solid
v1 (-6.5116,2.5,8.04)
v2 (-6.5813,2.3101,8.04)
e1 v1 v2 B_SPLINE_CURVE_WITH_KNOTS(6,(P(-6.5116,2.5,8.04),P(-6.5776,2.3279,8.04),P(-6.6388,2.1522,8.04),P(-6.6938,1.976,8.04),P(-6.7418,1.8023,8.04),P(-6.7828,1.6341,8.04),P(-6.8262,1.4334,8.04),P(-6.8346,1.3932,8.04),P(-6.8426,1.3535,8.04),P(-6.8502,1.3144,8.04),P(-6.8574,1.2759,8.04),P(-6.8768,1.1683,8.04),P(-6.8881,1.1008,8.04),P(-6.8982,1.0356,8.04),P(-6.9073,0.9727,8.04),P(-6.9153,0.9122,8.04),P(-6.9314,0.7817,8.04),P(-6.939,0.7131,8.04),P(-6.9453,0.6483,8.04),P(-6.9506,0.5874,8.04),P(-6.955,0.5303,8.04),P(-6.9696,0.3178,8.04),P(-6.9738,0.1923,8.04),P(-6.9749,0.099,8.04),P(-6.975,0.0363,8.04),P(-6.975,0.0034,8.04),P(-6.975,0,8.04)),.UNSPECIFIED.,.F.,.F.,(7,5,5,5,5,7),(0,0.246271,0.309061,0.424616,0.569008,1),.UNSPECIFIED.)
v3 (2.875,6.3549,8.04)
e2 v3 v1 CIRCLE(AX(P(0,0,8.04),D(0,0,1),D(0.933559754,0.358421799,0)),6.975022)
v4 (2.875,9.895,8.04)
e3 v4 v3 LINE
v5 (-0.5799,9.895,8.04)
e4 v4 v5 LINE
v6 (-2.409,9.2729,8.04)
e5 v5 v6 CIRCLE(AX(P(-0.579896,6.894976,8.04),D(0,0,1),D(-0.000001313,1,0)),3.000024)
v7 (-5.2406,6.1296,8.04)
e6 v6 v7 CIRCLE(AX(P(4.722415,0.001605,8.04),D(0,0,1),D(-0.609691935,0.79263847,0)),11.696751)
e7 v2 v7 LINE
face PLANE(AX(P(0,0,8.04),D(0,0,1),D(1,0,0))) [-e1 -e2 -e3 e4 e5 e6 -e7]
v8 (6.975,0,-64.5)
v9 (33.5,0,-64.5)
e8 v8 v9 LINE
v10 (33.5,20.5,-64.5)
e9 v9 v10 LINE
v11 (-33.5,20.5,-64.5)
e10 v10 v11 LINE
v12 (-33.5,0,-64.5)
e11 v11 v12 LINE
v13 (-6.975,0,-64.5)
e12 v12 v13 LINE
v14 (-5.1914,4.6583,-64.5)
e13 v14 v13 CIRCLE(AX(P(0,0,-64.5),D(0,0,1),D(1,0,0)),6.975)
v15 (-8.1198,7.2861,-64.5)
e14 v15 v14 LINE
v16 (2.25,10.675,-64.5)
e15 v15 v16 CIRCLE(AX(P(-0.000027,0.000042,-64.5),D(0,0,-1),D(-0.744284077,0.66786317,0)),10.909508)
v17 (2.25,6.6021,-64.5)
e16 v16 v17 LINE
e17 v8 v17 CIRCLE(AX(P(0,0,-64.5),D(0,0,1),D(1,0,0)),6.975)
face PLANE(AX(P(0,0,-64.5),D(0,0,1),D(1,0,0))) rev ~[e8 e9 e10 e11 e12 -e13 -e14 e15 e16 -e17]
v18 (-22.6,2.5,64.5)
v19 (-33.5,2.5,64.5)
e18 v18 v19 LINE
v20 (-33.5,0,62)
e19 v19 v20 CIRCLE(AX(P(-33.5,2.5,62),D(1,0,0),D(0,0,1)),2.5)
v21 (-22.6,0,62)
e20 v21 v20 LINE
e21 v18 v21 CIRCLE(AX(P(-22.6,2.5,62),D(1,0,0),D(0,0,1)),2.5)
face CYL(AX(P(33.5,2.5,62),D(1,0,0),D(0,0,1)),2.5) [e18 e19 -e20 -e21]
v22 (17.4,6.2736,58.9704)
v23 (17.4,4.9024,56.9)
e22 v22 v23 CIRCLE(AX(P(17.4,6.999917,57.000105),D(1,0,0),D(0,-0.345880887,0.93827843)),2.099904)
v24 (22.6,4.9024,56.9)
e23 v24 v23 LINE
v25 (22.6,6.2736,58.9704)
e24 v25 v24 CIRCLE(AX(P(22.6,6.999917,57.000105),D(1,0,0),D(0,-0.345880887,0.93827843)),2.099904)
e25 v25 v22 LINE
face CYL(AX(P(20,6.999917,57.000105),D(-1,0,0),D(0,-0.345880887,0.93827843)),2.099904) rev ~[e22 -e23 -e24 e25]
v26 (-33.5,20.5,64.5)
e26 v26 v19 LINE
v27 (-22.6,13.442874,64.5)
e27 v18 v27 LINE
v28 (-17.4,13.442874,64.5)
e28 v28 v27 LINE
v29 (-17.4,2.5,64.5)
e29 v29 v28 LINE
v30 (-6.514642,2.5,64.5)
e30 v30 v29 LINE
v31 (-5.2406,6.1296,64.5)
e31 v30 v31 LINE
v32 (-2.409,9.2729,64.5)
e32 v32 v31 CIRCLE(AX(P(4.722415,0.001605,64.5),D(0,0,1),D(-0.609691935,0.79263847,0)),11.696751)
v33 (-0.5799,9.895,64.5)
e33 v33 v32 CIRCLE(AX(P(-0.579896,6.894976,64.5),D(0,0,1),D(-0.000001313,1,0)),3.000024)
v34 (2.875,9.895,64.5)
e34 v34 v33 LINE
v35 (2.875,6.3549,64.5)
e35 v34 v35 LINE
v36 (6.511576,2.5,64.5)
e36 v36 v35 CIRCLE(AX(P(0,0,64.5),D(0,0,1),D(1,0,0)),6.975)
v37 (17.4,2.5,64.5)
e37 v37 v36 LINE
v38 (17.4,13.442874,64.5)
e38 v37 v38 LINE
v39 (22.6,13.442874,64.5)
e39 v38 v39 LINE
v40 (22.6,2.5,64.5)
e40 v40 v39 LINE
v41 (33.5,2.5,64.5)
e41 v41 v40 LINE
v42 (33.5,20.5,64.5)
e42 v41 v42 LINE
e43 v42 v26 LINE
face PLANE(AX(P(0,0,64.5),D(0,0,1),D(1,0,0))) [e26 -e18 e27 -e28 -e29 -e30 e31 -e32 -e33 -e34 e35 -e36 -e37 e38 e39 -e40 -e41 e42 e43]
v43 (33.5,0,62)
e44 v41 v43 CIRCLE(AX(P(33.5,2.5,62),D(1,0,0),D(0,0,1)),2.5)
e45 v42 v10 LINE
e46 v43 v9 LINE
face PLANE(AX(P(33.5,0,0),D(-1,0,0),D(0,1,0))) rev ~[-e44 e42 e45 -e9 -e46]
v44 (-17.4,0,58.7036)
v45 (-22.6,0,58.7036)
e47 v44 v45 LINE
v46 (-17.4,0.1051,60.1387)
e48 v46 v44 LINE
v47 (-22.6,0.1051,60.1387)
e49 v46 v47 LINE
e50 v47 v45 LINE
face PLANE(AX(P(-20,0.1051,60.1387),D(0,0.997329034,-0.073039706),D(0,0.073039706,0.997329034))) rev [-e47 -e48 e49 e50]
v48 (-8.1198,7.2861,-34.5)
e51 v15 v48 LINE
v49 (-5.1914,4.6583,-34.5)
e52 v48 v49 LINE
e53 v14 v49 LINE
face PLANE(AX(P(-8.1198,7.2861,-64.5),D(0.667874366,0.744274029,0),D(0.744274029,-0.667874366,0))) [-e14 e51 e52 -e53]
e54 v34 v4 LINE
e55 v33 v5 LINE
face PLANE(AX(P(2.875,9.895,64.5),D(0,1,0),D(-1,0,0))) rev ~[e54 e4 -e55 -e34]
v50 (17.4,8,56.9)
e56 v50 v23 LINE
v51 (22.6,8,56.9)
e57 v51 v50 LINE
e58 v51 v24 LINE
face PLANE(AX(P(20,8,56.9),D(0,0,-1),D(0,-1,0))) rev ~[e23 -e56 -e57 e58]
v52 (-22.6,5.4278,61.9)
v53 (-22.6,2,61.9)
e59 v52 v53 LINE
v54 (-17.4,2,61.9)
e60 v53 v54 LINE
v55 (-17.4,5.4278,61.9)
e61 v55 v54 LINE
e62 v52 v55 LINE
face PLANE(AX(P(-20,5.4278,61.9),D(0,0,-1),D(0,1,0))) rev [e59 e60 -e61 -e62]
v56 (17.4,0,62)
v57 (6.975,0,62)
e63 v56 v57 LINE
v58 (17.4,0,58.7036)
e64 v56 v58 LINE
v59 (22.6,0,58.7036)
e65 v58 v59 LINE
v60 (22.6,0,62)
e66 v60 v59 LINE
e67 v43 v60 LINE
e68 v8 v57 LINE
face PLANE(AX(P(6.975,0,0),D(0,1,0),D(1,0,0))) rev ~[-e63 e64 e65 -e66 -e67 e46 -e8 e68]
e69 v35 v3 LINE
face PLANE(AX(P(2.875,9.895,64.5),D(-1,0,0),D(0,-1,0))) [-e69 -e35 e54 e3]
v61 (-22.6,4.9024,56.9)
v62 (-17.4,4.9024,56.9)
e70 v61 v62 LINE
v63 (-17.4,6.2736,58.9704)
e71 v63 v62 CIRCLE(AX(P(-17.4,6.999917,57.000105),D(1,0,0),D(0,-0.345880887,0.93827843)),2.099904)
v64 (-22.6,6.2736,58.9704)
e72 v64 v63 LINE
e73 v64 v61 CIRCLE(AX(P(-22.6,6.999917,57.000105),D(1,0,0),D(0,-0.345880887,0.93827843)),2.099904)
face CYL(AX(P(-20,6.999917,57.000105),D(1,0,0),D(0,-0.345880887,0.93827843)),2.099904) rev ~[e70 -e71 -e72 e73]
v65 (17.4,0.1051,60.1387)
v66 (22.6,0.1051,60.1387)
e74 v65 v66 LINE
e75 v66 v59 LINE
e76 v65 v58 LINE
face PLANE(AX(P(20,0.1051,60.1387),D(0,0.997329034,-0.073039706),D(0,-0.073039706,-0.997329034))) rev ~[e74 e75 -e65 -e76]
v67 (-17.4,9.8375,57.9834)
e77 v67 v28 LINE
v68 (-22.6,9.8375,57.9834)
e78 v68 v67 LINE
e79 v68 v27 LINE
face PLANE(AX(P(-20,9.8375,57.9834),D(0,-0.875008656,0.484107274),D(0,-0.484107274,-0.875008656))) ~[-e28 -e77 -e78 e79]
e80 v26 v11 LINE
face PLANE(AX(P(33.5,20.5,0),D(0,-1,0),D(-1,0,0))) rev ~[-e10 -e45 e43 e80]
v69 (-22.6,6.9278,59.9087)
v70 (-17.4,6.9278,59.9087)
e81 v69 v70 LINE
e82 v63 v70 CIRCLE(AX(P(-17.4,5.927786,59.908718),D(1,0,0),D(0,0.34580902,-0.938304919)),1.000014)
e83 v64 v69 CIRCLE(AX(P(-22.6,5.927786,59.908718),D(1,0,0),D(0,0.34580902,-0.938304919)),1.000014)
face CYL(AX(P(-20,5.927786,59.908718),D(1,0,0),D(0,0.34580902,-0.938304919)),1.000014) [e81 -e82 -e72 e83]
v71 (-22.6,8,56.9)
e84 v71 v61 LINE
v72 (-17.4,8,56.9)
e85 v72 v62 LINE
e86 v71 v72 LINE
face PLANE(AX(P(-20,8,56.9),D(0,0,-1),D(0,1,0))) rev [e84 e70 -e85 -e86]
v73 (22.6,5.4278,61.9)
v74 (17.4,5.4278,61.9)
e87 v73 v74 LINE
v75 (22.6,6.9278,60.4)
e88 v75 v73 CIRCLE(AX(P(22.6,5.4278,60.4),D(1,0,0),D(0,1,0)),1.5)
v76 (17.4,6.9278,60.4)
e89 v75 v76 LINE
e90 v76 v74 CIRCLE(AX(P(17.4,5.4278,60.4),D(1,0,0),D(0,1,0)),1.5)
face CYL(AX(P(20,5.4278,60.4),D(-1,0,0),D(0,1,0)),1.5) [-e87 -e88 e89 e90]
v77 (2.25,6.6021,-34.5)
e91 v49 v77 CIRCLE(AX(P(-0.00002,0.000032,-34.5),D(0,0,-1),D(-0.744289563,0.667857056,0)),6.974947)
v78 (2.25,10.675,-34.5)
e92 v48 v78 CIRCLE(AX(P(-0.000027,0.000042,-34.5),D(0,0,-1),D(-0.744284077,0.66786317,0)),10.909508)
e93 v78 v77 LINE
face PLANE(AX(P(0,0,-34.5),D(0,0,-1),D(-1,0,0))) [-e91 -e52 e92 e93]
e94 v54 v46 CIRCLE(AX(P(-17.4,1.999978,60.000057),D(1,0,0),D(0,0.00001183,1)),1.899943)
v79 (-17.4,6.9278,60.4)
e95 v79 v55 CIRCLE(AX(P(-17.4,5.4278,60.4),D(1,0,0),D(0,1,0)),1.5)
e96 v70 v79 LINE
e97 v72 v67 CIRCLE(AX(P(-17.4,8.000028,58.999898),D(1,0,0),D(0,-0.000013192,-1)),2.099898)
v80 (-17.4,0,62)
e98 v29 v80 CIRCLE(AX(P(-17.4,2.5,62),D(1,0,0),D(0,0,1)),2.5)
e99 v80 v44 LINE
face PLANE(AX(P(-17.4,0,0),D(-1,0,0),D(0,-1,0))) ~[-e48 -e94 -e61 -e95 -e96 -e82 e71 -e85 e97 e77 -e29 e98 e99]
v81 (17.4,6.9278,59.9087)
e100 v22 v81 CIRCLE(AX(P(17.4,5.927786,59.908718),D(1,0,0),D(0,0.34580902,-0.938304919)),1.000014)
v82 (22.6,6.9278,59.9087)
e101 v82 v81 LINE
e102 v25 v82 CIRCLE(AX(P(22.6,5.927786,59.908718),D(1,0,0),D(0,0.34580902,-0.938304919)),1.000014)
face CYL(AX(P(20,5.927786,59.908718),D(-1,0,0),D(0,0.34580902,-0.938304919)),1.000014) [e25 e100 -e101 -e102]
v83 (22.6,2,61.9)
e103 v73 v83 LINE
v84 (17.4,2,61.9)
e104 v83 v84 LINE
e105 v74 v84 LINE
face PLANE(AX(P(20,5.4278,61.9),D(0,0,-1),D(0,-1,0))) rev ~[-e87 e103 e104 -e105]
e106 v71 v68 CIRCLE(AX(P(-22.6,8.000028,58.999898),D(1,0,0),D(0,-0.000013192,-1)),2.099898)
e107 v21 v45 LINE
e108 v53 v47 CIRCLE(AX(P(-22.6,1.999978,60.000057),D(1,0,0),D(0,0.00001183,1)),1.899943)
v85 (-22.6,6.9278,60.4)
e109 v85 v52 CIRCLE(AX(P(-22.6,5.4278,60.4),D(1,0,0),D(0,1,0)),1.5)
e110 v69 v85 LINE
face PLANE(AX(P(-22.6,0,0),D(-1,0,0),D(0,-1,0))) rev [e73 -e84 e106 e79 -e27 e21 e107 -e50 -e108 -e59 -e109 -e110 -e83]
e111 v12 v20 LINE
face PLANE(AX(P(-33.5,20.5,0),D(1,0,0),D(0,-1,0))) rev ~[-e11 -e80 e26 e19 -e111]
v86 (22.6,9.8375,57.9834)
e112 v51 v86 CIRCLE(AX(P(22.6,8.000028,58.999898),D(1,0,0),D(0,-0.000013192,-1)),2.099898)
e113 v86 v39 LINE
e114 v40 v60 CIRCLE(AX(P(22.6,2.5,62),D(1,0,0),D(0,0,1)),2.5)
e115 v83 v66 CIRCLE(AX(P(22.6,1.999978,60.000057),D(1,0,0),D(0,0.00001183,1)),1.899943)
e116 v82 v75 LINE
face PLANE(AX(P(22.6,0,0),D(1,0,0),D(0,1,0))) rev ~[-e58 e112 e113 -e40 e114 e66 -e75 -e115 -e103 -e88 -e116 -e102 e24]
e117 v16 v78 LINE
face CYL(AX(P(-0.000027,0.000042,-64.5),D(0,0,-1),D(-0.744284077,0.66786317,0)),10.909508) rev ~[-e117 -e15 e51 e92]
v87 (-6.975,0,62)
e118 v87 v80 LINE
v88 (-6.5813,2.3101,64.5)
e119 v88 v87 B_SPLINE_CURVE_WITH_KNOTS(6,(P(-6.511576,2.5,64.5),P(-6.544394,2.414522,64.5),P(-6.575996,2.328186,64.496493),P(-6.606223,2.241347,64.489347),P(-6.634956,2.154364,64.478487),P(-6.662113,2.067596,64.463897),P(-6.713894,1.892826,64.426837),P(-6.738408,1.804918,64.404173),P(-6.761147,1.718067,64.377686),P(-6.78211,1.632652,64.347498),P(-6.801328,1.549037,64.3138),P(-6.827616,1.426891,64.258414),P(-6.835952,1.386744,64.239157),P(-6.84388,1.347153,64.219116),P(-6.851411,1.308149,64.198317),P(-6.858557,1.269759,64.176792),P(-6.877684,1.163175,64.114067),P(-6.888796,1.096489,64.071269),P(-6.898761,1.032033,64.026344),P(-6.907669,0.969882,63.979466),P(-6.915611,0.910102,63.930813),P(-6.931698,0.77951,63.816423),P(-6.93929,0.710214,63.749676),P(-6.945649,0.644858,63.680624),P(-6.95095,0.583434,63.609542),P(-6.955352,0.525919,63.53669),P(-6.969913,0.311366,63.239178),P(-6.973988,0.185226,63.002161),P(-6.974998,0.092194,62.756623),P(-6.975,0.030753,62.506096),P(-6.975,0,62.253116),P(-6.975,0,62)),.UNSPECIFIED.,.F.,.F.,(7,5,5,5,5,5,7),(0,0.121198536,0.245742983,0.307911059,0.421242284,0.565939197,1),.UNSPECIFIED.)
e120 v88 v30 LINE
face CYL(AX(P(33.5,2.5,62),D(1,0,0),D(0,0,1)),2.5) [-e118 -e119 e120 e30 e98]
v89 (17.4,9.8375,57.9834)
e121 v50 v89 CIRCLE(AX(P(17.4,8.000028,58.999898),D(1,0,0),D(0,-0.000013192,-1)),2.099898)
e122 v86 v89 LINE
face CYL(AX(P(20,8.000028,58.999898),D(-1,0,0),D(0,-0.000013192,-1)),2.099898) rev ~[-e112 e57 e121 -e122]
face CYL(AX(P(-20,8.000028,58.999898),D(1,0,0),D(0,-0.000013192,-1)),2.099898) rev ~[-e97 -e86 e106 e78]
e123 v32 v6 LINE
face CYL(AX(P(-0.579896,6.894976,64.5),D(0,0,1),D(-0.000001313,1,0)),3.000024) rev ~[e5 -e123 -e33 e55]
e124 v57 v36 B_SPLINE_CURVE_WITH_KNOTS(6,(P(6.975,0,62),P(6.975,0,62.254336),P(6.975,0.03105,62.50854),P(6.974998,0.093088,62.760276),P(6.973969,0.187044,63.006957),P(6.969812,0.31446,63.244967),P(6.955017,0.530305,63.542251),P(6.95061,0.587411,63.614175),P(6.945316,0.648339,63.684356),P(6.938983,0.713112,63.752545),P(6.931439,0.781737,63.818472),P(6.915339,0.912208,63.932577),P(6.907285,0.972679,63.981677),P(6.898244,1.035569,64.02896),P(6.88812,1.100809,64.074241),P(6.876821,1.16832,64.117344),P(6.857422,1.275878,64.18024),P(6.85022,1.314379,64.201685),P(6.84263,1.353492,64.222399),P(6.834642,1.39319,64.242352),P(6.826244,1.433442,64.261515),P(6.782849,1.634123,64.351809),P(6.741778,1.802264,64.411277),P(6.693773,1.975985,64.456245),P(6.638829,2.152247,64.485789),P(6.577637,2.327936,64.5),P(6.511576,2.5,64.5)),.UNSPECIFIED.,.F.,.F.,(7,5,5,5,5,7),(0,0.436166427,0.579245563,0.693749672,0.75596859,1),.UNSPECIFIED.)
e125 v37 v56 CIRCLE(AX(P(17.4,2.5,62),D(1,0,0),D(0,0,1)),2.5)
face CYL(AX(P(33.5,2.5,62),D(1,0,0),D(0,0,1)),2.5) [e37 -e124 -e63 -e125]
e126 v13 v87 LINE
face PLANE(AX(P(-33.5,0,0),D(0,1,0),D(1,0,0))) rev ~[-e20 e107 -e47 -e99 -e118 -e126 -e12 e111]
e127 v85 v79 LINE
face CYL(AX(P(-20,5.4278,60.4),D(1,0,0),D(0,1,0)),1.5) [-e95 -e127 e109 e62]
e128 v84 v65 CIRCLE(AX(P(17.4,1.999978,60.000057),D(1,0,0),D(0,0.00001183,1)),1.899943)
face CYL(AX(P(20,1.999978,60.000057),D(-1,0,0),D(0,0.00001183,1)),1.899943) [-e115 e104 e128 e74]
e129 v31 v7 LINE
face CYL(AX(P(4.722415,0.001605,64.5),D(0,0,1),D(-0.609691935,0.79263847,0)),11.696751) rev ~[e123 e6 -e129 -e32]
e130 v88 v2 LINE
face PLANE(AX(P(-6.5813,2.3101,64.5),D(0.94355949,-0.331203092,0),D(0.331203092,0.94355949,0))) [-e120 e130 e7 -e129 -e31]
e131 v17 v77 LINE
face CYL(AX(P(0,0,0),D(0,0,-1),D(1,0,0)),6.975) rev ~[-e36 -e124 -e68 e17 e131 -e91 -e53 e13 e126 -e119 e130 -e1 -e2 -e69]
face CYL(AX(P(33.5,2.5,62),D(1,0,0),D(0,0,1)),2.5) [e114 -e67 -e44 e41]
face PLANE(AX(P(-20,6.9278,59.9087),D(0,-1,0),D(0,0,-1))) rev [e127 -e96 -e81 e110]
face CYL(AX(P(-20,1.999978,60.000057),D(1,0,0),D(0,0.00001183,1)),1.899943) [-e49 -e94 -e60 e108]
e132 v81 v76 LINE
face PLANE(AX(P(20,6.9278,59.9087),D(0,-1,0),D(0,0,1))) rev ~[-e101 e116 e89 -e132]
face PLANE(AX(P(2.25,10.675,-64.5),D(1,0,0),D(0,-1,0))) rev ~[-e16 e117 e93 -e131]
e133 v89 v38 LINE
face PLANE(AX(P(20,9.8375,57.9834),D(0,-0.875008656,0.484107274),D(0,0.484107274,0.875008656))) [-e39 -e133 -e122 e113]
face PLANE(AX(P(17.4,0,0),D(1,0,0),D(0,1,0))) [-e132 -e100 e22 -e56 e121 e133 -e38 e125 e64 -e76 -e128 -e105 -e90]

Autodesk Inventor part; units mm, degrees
ref_plane "XZ Plane" through (0, 0, 0) normal (0, 1, 0) x (-1, 0, 0)
ref_plane "XY Plane" through (0, 0, 0) normal (0, 0, 1) x (1, 0, 0)
sketch "Sketch1" plane through (0, 0, 0) normal (0, 0, 1) x (1, 0, 0)
  line L0 (0, 0) -> (0, 44.0101) construction
  line L1 (-33.5, 0) -> (-6.975, 0)
  line L2 (6.975, 0) -> (33.5, 0)
  arc A0 (6.975, 0) -> (-6.975, 0) centre (0, 0) ccw
  line L3 (33.5, 0) -> (33.5, 20.5)
  line L4 (33.5, 20.5) -> (-33.5, 20.5)
  line L5 (-33.5, 20.5) -> (-33.5, 0)
ref_plane "Work Plane1" through (20, 0, 0) normal (1, 0, 0) x (0, 1, 0)
extrude "Extrusion3" add sketch "Sketch1" along normal mid plane 129
sketch "Sketch4" plane through (20, 0, 0) normal (1, 0, 0) x (0, 1, 0)
  line L0 (0, 64.5) -> (0, -64.5) projected
  line L1 (2, 64.6) -> (10.1, 64.6)
  arc A0 (8, 56.9) -> (9.8375, 57.9834) centre (8, 59) ccw
  line L2 (8, 56.9) -> (4.9024, 56.9)
  arc A1 (6.2736, 58.9704) -> (4.9024, 56.9) centre (7, 57) ccw
  line L3 (6.9278, 59.9087) -> (6.9278, 60.4)
  line L4 (5.4278, 61.9) -> (2, 61.9)
  arc A2 (2, 61.9) -> (0.1051, 60.1387) centre (2, 60) ccw
  line L5 (0.1051, 60.1387) -> (0, 58.7036)
  line L6 (0, 62.6) -> (0, 58.7036)
  line L7 (0, -64.5) -> (0, 64.5) projected
  arc A3 (2, 64.6) -> (0, 62.6) centre (2, 62.6) ccw
  arc A4 (6.9278, 60.4) -> (5.4278, 61.9) centre (5.4278, 60.4) ccw
  line L8 (9.8375, 57.9834) -> (13.4982, 64.6)
  line L9 (13.4982, 64.6) -> (10.1, 64.6)
  arc A5 (6.2736, 58.9704) -> (6.9278, 59.9087) centre (5.9278, 59.9087) ccw
  point P0 (0, 0)
  point P1 (0, 64.6)
  point P2 (8, 64.6)
  point P3 (10.1, 62.5)
  point P4 (6.9278, 59.0988)
  point P5 (6.9278, 61.9)
  point P6 (0, 62.6)
  dimension "d33" = 2
  dimension "d34" = 1.5
  dimension "d35" = 1
extrude "Extrusion4" cut sketch "Sketch4" along normal mid plane 5.2
mirror "Mirror2" about plane through (0, 0, 0) normal (1, 0, 0) of "Extrusion4"
sketch "Sketch5" plane through (33.5, 0, 64.5) normal (1, 0, 0) x (0, 0, -1)
  line L0 (1.9, 0) -> (5.7964, 0) projected
  arc A0 (0, 2.5) -> (2.5, 0) centre (2.5, 2.5) ccw
  line L1 (2.5, 2.5) -> (2.5, 0) construction
  line L2 (2.5, 2.5) -> (5, 2.5) construction
  line L3 (2.5, 2.5) -> (0, 2.5) construction
  line L4 (0, 0) -> (0, 20.5) projected
  line L5 (0, 2.5) -> (0, 0)
  line L6 (0, 0) -> (129, 0) projected
  point P0 (64.5, 0)
  dimension "d36" = 90
  dimension "d37" = 90
  dimension "d38" = 2.5
extrude "Extrusion5" cut sketch "Sketch5" against normal through all
sketch "Sketch6" plane through (0, 0, 64.5) normal (0, 0, 1) x (1, 0, 0)
  arc A0 (6.5116, 2.5) -> (-6.5116, 2.5) centre (0, 0) ccw projected
  line L0 (0, 6.975) -> (2.875, 6.975) construction
  line L1 (2.875, 6.975) -> (2.875, 9.895) construction
  line L2 (-17.4, 0) -> (-6.975, 0) projected
  line L3 (2.875, 9.895) -> (2.875, 6.3549)
  spline S0 degree 6 poles (-6.5116, 2.5) (-6.5776, 2.3279) (-6.6388, 2.1522) (-6.6938, 1.976) (-6.7418, 1.8023) (-6.7828, 1.6341) (-6.8262, 1.4334) (-6.8346, 1.3932) (-6.8426, 1.3535) (-6.8502, 1.3144) (-6.8574, 1.2759) (-6.8768, 1.1683) (-6.8881, 1.1008) (-6.8982, 1.0356) (-6.9073, 0.9727) (-6.9153, 0.9122) (-6.9314, 0.7817) (-6.939, 0.7131) (-6.9453, 0.6483) (-6.9506, 0.5874) (-6.955, 0.5303) (-6.9696, 0.3178) (-6.9738, 0.1923) (-6.9749, 0.099) (-6.975, 0.0363) (-6.975, 0.0034) (-6.975, 0.0002) knots 0 0 0 0 0 0 0 0.246271 0.246271 0.246271 0.246271 0.246271 0.309061 0.309061 0.309061 0.309061 0.309061 0.424616 0.424616 0.424616 0.424616 0.424616 0.569008 0.569008 0.569008 0.569008 0.569008 1 1 1 1 1 1 1 projected
  line L4 (2.875, 9.895) -> (-0.5799, 9.895)
  line L5 (-2.875, 9.895) -> (-2.875, 8.895) construction
  arc A1 (-2.409, 9.2729) -> (-5.2406, 6.1296) centre (4.7239, 0) ccw
  arc A2 (-0.5799, 9.895) -> (-2.409, 9.2729) centre (-0.5799, 6.895) ccw
  line L6 (-6.5813, 2.3101) -> (-5.2406, 6.1296)
  point P0 (-1.5174, 9.895)
  dimension "d41" = 2.875
  dimension "d42" = 2.92
  dimension "d50" = 5.75
  dimension "d52" = 3
sketch "Sketch7" plane through (0, 0, -64.5) normal (0, 0, -1) x (-1, 0, 0)
  arc A0 (6.975, 0) -> (-6.975, 0) centre (0, 0) ccw construction
  line L0 (0, 6.975) -> (-2.25, 6.975) construction
  line L1 (-2.25, 6.975) -> (-2.25, 10.675) construction
  arc A1 (8.1198, 7.2861) -> (-2.25, 10.675) centre (0, 0) ccw
  line L2 (0, 0) -> (8.1198, 7.2861) construction
  line L3 (0, 0) -> (-2.25, 10.675) construction
  line L4 (-2.25, 10.675) -> (-2.25, 6.6021)
  line L5 (8.1198, 7.2861) -> (5.1914, 4.6583)
  arc A2 (5.1914, 4.6583) -> (-2.25, 6.6021) centre (0, 0) ccw
  dimension "d45" = 2.25
  dimension "d46" = 3.7
  dimension "d47" = 60
extrude "Extrusion7" cut sketch "Sketch7" against normal blind 30
extrude "Extrusion8" cut sketch "Sketch6" against normal blind 56.46
properties part number "Laser_Pen_Housing_Top"
